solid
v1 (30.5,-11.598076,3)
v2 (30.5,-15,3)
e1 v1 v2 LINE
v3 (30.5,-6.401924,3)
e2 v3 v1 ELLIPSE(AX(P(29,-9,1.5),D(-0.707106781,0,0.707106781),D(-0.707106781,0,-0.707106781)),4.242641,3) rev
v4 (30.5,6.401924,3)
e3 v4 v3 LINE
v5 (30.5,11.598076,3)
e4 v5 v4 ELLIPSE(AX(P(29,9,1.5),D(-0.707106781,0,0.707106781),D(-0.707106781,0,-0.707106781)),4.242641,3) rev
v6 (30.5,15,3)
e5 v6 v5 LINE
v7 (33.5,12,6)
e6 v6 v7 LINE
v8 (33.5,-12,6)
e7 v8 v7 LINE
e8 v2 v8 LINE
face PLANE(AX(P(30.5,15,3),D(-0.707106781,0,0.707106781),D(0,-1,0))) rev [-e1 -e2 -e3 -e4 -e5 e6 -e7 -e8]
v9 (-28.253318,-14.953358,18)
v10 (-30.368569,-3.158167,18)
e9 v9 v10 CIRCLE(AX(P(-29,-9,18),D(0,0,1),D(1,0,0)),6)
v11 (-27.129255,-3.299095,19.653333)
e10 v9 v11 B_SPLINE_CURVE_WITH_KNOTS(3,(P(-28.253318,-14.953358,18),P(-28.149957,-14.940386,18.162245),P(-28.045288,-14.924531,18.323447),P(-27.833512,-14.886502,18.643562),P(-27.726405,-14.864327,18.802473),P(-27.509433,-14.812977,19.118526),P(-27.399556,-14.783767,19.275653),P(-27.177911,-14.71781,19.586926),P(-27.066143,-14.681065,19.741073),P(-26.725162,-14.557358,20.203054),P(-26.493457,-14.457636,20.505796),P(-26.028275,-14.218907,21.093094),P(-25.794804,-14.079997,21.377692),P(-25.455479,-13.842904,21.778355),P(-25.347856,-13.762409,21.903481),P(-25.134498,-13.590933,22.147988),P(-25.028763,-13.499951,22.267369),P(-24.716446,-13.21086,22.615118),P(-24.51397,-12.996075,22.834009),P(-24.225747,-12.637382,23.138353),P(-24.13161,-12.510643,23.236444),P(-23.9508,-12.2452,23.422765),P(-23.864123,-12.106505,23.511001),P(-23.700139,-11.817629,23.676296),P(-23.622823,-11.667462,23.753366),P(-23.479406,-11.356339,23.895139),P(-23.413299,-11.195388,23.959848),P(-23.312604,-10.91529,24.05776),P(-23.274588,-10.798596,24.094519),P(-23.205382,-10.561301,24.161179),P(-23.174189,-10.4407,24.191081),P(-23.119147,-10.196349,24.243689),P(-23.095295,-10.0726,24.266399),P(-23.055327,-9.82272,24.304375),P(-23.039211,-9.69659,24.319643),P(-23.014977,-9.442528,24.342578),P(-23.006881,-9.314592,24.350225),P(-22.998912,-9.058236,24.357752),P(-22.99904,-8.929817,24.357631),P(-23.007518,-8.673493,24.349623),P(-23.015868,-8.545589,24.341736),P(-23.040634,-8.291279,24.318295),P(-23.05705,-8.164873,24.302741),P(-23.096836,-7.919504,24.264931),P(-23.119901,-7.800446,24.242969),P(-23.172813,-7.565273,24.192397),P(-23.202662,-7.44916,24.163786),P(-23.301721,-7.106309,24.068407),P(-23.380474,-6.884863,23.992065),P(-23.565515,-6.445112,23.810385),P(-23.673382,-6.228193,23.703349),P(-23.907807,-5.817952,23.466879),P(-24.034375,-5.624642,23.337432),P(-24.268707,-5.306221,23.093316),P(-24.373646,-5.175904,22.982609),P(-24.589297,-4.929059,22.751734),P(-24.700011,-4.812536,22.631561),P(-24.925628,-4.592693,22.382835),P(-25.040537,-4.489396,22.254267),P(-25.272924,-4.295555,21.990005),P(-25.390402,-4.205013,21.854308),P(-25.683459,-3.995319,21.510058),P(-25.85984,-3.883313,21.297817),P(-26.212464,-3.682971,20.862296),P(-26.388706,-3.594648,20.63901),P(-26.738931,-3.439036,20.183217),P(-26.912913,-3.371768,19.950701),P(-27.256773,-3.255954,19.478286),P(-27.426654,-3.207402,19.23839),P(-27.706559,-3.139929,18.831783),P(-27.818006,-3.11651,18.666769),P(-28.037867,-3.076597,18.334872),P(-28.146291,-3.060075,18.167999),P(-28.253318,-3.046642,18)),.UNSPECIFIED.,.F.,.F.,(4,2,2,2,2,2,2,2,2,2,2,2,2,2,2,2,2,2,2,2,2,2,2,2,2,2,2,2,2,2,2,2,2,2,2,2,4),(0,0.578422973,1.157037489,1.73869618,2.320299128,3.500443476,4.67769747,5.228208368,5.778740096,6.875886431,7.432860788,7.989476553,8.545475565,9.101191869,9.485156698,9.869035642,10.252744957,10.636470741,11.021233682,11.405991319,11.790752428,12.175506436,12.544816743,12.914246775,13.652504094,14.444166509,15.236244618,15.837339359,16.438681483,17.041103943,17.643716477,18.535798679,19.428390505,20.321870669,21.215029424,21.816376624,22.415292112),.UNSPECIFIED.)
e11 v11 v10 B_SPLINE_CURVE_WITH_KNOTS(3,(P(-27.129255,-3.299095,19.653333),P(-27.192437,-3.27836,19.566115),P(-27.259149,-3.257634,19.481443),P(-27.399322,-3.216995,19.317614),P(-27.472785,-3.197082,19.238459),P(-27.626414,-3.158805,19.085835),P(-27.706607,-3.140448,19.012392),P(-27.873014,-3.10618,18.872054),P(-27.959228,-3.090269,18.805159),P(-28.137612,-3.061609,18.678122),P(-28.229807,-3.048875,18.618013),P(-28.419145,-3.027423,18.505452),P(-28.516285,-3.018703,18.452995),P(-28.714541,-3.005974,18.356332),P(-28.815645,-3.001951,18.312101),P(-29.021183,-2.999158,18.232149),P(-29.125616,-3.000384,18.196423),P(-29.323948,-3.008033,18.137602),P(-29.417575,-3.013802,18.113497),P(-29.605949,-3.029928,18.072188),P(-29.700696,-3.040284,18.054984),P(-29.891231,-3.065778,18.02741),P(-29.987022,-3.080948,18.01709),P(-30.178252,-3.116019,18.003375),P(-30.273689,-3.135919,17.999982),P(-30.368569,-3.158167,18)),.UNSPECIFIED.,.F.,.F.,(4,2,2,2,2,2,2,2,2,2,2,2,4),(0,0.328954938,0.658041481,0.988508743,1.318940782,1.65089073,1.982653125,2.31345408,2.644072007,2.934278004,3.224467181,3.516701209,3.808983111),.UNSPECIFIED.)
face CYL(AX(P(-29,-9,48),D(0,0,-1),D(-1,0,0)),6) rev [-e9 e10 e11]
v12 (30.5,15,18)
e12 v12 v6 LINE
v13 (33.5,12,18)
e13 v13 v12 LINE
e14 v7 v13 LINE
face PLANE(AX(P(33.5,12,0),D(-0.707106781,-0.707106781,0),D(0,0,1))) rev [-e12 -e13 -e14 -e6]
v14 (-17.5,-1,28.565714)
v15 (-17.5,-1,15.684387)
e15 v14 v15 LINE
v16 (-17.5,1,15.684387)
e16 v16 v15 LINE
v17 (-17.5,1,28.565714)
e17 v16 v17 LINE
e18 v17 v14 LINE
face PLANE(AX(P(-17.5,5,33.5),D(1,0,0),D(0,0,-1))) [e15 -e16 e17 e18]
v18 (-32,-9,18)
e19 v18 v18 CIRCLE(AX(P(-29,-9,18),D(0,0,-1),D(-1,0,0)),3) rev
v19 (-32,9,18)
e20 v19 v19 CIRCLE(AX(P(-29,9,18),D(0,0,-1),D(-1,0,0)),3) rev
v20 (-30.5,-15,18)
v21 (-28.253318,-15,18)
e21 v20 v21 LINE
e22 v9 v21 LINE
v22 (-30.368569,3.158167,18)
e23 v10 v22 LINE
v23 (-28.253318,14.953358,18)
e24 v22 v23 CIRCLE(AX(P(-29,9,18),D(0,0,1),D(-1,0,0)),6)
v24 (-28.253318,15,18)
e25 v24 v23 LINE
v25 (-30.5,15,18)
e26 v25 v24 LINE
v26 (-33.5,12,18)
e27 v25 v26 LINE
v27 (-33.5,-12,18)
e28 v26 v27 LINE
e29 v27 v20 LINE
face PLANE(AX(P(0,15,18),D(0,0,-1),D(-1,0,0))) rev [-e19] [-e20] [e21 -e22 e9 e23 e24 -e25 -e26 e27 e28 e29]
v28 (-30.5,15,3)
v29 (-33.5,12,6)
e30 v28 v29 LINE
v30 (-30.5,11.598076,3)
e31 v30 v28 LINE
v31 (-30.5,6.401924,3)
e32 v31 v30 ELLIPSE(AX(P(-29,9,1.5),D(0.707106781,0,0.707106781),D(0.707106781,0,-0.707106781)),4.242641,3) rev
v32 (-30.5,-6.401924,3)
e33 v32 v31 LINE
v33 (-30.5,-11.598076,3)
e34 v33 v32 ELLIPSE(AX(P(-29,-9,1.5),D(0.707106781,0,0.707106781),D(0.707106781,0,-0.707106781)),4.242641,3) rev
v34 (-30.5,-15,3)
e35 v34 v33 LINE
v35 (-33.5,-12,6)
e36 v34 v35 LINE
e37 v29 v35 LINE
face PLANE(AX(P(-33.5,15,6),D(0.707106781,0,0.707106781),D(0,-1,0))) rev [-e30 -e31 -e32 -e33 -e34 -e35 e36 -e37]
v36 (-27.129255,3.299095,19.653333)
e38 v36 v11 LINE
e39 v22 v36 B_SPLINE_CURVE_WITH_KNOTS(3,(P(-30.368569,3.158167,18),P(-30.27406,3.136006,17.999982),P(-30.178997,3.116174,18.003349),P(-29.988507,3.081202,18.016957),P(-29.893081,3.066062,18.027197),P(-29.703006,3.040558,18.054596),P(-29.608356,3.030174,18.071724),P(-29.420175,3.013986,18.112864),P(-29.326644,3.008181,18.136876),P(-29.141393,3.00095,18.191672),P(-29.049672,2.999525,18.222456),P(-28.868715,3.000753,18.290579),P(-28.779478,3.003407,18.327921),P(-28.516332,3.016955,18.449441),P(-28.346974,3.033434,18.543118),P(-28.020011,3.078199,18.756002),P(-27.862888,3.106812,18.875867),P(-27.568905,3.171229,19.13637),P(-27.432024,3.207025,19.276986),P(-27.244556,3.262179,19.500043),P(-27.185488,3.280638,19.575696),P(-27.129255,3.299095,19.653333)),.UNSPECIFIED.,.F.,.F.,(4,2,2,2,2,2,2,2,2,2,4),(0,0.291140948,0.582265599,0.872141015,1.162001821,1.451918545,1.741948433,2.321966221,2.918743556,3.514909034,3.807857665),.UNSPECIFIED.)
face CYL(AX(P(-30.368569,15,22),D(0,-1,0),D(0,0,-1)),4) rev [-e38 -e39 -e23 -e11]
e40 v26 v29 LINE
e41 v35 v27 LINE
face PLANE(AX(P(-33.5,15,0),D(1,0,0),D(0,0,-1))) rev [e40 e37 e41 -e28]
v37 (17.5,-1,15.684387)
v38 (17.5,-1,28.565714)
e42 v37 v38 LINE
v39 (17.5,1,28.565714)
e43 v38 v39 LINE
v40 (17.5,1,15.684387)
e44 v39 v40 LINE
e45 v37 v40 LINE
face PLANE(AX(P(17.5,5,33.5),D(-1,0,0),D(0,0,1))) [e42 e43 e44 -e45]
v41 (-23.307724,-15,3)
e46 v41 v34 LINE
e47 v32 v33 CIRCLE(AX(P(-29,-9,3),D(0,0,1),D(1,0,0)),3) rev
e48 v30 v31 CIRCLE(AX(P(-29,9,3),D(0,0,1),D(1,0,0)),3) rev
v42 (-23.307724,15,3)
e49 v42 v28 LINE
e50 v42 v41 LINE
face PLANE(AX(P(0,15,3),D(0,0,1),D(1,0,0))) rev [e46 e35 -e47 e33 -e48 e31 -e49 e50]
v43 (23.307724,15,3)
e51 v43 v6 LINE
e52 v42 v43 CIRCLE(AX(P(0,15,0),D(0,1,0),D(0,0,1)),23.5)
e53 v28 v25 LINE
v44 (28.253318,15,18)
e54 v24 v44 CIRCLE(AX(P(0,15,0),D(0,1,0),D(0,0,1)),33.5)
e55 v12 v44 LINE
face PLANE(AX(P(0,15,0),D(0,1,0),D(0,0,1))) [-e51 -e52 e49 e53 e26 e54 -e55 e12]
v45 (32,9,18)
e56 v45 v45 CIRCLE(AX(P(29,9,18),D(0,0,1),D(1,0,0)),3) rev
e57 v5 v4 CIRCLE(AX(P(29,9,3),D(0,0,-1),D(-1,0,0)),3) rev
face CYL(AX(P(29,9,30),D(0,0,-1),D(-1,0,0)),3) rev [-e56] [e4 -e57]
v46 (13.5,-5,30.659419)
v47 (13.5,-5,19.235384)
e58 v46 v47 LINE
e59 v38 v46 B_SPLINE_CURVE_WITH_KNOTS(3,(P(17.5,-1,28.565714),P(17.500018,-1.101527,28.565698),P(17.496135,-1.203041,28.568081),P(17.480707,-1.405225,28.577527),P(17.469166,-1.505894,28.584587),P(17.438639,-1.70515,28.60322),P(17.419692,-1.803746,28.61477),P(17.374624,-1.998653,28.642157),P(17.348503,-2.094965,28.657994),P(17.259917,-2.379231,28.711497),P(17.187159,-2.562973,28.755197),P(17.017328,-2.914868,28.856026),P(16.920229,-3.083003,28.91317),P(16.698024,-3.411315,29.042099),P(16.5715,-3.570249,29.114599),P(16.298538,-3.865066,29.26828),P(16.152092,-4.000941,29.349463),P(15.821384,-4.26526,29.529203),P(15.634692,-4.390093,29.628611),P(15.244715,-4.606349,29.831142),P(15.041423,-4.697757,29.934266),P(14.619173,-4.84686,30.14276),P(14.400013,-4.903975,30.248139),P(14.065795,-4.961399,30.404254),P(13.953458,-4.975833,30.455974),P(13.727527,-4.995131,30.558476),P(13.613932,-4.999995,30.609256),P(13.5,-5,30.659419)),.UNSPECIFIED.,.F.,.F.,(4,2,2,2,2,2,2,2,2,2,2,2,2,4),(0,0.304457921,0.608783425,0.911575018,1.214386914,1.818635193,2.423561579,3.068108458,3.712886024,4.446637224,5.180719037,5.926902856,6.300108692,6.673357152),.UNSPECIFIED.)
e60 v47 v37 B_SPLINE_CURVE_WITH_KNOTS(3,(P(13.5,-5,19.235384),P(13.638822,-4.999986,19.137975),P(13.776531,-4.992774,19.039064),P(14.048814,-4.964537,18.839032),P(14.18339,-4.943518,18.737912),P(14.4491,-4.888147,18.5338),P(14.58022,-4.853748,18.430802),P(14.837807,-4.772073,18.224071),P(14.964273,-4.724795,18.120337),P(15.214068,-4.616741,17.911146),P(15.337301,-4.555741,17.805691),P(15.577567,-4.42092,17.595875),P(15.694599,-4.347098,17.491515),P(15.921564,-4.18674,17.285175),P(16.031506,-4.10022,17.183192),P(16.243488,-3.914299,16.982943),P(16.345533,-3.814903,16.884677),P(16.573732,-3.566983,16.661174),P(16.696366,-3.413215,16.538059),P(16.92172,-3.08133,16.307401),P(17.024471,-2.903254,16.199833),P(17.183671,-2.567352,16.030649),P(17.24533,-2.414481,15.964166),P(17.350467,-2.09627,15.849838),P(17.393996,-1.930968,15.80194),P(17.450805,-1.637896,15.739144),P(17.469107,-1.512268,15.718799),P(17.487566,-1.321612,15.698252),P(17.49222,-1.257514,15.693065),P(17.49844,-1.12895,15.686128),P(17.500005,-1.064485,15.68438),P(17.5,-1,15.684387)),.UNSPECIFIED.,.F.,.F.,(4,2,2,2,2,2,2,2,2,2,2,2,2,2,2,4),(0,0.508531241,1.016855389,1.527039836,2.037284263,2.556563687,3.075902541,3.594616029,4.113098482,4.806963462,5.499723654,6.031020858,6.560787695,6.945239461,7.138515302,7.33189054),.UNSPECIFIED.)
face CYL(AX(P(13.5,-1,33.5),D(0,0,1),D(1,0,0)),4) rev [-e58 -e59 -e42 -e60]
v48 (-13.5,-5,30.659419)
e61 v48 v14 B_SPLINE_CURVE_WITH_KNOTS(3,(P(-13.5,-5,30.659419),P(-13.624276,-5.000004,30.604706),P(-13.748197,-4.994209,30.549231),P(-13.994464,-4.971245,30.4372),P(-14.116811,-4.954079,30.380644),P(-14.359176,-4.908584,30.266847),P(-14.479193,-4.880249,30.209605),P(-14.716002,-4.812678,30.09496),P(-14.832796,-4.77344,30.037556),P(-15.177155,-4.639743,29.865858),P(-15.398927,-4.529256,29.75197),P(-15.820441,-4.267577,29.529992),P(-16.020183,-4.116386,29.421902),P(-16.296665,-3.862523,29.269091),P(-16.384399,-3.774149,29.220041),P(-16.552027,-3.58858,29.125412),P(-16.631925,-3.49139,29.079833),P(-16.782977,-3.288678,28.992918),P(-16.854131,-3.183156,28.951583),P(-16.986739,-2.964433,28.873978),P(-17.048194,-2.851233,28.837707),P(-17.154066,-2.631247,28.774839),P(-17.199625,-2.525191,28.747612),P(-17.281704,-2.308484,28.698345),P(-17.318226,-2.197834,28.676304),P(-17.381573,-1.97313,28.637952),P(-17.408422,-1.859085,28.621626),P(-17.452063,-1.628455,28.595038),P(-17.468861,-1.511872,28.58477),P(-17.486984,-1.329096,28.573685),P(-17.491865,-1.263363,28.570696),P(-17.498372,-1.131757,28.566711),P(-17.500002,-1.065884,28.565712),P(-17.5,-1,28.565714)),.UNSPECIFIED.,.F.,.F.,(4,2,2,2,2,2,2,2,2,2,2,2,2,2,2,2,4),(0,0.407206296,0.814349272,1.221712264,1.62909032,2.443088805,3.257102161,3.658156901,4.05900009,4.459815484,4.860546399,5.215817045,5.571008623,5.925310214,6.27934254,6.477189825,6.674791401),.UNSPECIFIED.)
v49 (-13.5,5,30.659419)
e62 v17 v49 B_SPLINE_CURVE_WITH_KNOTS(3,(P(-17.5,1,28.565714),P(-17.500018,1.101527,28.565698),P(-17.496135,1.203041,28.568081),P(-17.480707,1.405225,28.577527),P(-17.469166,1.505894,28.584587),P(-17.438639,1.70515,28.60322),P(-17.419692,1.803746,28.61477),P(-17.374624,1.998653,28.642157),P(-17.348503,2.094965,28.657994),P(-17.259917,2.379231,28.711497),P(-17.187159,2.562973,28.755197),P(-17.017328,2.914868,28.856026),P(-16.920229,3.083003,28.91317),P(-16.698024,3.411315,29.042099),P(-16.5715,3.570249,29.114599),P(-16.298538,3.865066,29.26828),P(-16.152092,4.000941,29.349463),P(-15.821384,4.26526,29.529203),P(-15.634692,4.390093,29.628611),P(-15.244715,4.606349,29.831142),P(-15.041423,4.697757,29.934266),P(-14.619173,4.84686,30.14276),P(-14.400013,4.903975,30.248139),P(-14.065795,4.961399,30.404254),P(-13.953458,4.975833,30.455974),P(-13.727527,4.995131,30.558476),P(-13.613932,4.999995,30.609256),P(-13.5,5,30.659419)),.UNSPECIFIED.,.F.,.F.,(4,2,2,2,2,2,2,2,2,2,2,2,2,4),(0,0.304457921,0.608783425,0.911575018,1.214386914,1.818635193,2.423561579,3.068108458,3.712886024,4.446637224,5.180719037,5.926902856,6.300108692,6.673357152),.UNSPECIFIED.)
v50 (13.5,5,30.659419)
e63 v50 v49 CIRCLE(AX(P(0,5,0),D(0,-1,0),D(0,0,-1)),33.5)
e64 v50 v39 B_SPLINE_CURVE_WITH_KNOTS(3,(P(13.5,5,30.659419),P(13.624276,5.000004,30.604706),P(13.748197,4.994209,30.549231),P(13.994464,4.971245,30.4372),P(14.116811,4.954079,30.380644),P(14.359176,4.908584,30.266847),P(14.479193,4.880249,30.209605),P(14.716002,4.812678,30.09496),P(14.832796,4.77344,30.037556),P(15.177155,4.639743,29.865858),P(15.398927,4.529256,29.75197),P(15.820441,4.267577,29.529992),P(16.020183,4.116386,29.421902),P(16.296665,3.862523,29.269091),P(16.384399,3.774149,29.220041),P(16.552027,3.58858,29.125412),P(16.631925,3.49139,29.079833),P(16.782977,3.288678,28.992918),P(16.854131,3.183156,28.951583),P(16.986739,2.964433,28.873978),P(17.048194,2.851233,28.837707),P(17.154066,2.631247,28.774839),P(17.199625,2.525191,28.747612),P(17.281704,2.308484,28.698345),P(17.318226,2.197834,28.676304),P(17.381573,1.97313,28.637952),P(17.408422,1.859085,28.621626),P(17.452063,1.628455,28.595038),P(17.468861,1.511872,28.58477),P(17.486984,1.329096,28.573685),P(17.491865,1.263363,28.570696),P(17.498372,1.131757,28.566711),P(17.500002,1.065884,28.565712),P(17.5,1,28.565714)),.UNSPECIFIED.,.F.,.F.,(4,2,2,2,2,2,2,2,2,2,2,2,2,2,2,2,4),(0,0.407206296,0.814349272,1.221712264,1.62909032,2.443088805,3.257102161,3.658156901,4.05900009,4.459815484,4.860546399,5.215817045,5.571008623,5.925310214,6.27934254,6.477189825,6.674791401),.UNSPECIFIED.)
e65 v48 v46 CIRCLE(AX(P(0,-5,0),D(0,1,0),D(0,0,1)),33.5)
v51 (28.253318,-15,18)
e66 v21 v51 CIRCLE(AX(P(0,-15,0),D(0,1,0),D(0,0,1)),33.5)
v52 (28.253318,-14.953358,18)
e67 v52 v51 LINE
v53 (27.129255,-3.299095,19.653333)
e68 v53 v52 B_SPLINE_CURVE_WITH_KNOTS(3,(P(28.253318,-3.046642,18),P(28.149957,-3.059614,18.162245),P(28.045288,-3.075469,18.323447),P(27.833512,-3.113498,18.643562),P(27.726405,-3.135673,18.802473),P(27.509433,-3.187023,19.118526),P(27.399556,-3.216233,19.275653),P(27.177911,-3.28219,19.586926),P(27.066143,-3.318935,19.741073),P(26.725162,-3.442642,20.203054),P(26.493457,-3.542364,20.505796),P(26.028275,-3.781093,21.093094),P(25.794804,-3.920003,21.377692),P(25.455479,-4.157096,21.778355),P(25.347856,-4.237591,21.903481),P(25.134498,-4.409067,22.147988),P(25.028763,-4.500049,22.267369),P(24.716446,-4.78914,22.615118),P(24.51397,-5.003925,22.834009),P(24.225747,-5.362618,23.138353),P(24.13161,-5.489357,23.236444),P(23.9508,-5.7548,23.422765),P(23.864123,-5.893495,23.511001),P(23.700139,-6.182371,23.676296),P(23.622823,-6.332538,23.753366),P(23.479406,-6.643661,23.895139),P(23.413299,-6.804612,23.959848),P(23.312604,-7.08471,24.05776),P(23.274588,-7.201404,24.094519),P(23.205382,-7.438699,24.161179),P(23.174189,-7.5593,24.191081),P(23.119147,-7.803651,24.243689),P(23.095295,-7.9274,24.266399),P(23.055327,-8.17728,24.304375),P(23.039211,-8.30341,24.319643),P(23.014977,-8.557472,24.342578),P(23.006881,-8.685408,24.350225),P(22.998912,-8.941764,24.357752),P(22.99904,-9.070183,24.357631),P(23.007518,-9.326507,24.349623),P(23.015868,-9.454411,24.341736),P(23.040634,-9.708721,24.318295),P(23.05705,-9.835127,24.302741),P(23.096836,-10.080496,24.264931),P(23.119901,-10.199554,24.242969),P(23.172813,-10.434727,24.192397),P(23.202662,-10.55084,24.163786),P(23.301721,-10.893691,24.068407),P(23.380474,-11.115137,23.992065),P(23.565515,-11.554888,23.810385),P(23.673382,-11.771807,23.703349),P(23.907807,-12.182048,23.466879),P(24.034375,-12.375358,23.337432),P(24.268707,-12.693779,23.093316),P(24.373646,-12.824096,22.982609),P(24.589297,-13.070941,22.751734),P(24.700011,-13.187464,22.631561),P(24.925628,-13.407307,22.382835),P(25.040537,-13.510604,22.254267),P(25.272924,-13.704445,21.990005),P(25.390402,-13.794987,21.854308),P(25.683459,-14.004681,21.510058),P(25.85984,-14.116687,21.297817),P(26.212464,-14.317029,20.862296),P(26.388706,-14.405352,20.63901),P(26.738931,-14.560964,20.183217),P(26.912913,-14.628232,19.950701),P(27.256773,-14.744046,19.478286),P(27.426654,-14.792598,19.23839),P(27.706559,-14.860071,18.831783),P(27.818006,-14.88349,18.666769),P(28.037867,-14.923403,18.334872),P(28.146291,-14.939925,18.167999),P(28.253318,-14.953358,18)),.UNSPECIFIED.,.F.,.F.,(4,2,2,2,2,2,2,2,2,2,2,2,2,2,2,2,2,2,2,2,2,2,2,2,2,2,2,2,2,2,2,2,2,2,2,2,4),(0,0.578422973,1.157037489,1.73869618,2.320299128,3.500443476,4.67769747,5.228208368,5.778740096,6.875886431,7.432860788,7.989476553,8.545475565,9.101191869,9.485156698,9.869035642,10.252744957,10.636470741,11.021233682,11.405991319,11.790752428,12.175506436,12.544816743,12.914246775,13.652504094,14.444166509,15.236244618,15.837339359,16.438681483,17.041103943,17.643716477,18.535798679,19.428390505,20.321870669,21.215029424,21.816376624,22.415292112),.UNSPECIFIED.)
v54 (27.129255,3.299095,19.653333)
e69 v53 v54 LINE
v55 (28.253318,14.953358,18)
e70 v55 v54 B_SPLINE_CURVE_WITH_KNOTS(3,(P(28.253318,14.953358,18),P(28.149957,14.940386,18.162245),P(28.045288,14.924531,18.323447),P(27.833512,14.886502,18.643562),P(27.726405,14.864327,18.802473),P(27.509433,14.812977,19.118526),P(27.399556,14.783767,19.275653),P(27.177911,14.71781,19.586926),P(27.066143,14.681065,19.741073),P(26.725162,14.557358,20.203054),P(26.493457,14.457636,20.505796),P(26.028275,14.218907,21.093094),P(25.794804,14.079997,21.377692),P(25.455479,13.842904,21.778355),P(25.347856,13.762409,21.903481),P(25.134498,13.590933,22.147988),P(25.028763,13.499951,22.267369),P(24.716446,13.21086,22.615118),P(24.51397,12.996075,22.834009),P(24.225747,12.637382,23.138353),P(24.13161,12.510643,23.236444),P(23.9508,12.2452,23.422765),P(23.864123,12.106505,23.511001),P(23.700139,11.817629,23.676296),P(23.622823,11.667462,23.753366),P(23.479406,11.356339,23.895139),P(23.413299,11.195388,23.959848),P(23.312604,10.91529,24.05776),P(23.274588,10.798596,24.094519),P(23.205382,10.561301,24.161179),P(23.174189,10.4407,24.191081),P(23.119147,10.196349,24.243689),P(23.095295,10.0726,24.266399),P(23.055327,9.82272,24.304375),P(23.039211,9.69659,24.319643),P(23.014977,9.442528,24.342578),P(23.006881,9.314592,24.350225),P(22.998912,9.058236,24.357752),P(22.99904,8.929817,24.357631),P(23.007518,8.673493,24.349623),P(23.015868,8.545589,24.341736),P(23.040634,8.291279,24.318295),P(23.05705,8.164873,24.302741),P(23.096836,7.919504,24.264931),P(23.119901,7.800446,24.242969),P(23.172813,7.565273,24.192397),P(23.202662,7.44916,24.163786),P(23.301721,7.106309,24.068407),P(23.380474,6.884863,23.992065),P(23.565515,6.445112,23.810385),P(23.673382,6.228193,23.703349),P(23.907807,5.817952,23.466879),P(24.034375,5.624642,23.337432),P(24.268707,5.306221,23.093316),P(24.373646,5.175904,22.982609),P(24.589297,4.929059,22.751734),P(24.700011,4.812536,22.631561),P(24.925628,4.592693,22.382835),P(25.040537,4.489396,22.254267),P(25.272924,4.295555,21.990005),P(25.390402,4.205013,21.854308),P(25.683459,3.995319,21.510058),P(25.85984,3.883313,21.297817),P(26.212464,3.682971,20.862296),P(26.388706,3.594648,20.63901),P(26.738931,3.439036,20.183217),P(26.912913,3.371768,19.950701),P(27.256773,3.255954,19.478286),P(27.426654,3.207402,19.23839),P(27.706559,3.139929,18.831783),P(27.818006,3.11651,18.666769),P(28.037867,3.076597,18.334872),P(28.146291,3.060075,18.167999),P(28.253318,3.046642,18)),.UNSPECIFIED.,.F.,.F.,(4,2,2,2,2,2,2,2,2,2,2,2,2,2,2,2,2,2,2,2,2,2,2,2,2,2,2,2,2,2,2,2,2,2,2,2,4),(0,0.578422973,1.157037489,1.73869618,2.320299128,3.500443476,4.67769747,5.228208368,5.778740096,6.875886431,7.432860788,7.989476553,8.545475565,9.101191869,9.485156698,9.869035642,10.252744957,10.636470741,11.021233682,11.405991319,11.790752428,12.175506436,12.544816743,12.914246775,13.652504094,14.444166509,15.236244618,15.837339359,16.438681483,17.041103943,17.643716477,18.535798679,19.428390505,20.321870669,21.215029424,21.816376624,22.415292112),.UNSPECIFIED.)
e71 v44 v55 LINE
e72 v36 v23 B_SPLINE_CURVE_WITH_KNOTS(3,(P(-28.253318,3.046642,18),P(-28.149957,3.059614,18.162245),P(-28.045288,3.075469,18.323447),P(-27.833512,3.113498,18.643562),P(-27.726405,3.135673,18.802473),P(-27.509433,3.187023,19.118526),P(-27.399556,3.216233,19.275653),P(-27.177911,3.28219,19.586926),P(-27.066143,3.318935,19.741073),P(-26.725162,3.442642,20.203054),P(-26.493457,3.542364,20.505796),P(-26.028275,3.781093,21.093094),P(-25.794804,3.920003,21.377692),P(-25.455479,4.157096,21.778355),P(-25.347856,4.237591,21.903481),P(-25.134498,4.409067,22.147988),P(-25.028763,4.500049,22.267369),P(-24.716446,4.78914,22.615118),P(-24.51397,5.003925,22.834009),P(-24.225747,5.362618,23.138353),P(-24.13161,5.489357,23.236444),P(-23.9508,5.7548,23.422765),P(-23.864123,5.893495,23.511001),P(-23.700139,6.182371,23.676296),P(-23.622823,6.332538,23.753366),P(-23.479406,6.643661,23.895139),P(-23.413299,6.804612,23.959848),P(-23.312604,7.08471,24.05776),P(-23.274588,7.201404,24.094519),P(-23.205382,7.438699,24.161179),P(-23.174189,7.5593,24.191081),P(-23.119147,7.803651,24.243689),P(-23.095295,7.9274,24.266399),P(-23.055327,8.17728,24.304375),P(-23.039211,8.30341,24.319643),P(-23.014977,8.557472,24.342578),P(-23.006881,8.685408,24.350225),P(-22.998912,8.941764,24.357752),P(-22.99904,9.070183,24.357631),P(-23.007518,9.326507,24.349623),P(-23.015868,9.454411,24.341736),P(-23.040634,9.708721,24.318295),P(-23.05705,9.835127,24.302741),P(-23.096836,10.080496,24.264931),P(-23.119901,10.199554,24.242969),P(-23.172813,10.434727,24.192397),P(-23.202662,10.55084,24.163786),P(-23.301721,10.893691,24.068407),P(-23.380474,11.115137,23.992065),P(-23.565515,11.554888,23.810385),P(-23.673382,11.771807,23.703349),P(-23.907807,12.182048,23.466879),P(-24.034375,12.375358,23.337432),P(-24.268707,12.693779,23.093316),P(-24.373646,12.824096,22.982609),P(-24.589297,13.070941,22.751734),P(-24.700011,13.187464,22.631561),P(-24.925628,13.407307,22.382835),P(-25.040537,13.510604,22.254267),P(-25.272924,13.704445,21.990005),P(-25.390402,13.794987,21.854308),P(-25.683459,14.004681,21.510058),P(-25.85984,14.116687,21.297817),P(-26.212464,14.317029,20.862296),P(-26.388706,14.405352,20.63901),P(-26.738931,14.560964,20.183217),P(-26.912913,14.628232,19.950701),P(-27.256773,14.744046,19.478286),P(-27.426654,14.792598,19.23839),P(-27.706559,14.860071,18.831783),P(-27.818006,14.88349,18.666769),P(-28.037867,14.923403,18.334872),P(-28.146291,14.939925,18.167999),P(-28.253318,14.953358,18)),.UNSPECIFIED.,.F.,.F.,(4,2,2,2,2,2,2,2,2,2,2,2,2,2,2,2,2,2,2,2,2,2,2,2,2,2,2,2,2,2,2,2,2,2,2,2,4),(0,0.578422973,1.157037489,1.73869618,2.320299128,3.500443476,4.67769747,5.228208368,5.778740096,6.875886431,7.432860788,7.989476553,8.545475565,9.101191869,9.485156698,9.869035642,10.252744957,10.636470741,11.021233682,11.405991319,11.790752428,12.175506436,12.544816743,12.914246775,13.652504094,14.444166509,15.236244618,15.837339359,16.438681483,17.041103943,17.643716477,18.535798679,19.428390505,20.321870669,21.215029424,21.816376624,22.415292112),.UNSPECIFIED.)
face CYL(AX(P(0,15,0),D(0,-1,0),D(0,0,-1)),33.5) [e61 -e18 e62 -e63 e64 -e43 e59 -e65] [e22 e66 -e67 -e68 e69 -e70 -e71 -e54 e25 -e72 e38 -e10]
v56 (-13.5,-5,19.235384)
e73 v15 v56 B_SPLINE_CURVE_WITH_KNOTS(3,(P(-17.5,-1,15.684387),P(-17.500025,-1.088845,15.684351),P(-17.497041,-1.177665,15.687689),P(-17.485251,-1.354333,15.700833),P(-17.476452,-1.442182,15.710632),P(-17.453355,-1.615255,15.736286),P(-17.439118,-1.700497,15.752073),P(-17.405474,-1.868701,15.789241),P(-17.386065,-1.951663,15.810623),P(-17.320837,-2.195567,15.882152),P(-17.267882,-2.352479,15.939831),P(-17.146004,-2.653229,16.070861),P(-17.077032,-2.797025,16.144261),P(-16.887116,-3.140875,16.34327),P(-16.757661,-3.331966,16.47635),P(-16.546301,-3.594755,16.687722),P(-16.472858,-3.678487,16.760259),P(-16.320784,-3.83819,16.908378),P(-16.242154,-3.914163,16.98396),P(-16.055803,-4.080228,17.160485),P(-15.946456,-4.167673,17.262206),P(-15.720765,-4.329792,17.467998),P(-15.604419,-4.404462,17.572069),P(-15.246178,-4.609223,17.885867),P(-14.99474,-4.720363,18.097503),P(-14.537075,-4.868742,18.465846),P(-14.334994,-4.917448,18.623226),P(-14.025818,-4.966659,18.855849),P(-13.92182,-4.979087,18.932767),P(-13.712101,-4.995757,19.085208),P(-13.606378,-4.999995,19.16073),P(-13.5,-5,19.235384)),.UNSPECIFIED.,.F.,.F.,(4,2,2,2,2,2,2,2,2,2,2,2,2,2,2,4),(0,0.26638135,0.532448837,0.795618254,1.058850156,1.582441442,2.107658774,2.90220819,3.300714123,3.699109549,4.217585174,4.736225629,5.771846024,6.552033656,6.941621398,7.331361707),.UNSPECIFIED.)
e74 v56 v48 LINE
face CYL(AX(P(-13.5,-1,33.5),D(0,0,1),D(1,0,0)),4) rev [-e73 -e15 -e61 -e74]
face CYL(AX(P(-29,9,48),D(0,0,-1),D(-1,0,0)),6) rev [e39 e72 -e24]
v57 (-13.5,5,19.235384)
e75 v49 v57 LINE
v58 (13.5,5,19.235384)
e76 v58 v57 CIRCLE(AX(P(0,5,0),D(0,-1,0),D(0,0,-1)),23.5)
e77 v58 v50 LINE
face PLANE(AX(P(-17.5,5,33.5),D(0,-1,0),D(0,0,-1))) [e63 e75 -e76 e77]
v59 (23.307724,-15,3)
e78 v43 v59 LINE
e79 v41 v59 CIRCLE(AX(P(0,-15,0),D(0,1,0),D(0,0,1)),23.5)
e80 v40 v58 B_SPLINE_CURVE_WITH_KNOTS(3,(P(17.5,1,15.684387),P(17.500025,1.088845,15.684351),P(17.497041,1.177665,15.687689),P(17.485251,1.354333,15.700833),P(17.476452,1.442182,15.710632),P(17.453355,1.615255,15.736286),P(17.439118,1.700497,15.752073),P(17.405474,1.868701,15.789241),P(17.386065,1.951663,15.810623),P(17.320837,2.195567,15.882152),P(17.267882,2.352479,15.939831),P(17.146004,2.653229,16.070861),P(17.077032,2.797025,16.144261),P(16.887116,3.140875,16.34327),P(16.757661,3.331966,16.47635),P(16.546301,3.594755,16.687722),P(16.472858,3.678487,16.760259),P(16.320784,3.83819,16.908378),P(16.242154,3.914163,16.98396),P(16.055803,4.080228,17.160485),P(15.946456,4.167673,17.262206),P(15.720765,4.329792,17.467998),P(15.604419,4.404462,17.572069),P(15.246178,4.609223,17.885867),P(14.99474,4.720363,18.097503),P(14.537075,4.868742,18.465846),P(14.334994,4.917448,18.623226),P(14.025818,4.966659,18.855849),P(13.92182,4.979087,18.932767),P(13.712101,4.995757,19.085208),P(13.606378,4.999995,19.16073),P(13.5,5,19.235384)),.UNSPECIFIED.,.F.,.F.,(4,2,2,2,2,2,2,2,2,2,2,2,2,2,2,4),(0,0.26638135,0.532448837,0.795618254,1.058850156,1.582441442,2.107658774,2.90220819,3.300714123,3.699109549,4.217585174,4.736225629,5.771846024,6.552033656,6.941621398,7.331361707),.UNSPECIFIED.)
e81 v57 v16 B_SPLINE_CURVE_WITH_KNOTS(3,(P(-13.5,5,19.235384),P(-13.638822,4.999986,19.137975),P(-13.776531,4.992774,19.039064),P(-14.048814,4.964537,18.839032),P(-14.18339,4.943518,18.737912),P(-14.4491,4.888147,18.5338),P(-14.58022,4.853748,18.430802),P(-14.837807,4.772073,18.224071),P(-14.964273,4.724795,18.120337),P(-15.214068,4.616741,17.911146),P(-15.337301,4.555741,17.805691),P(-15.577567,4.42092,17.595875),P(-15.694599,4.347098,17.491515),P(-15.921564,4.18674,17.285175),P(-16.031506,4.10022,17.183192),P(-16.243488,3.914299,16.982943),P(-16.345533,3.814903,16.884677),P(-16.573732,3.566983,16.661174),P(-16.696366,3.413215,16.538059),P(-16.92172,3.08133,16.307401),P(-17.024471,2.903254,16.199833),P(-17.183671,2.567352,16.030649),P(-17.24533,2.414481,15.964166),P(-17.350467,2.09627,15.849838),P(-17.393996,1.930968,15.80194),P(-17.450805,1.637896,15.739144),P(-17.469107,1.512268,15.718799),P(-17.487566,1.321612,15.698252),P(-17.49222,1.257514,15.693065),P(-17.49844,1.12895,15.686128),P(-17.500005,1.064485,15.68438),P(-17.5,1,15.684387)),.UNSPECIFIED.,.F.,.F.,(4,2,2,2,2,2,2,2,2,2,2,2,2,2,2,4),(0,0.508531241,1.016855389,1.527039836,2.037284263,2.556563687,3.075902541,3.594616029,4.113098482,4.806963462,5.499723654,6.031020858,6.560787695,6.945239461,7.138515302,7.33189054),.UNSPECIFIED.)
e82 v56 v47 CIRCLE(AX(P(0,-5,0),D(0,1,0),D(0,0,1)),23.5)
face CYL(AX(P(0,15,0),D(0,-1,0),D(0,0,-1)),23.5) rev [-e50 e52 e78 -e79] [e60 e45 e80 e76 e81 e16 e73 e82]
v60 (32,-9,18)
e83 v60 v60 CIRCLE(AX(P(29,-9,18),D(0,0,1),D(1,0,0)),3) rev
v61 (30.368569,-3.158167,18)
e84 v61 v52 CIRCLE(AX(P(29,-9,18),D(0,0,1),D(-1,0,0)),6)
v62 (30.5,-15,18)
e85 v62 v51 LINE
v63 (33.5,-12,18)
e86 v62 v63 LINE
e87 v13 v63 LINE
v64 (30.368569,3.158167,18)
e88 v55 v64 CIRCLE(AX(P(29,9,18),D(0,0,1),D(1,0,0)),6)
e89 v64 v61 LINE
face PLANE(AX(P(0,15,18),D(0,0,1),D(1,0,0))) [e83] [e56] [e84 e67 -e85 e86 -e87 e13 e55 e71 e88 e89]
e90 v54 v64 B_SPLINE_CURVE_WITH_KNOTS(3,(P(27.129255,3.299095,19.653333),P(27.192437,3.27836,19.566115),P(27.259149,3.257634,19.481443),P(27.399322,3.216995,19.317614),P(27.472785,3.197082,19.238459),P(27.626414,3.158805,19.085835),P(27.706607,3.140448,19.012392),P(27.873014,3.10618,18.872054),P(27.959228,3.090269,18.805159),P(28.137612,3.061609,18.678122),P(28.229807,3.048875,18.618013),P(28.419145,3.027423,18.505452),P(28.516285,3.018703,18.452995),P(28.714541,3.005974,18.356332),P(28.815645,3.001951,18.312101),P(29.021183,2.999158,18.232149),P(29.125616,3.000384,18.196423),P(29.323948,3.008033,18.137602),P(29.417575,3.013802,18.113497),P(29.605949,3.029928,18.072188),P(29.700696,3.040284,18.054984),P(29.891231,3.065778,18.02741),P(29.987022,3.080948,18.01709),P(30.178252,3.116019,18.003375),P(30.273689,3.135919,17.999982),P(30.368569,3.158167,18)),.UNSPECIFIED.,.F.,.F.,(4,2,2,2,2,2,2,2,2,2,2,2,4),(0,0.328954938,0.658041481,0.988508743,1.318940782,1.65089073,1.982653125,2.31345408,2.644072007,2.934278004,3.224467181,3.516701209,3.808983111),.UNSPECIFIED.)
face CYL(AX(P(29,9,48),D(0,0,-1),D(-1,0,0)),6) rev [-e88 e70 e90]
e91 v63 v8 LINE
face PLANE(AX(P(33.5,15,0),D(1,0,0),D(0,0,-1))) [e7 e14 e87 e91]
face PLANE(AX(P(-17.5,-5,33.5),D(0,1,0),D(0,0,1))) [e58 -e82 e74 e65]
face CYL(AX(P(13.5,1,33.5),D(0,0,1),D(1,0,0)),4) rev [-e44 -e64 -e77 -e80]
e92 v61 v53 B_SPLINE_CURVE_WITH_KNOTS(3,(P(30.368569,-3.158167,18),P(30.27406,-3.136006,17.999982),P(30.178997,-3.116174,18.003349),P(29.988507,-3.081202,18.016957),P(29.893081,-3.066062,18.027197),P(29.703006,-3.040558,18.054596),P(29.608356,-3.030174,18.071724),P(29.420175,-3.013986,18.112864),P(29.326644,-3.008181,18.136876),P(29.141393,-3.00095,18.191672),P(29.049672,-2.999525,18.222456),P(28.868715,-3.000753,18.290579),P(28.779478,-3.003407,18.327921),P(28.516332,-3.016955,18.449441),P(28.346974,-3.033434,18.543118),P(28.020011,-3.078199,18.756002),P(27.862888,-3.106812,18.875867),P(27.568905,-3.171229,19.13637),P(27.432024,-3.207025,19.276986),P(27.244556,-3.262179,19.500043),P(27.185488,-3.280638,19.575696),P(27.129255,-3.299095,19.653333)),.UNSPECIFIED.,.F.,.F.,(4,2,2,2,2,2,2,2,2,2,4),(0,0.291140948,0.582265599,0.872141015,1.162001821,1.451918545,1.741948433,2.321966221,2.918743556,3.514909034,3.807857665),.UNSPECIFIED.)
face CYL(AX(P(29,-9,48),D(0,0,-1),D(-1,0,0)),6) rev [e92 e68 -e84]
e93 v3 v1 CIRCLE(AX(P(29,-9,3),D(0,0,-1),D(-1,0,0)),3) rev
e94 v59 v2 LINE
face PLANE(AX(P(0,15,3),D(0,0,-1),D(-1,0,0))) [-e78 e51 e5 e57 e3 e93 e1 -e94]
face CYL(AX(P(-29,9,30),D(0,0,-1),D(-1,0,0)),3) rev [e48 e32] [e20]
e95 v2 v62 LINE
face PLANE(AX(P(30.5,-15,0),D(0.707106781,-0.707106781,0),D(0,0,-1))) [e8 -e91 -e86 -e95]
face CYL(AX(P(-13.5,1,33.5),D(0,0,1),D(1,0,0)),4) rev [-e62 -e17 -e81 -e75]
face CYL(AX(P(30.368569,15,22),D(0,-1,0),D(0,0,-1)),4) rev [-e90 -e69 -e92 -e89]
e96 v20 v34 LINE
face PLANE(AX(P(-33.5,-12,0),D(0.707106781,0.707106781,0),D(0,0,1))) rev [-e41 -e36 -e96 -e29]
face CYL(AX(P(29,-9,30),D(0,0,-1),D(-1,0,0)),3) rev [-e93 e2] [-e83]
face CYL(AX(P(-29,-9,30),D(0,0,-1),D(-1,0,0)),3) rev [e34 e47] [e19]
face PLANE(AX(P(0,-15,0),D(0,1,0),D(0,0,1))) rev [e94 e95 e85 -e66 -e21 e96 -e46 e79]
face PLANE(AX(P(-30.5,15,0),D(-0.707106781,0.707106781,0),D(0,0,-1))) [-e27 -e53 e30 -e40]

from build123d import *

# Parameters (mm, degrees)
BOSS_EXTRUDE1_DEPTH = 15
SKETCH2_R           = 3
CUT_EXTRUDE1_DEPTH  = 30
SKETCH3_W           = 35
SKETCH3_H           = 10
CUT_EXTRUDE2_DEPTH  = 50.694064129
FILLET1_R           = 4
SKETCH4_R           = 6
CUT_EXTRUDE3_DEPTH  = 30
FILLET2_R           = 4
CHAMFER1_SIZE       = 3


with BuildPart() as part:
    # Sketch1 → Boss-Extrude1 (new, symmetric)
    with BuildSketch(Plane(origin=(0, 0, 0), x_dir=(1, 0, 0), z_dir=(0, 1, 0))):
        with BuildLine():
            ThreePointArc((-28.253318389, -18), (-31.709094157, -10.806634433), (-33.365401241, -3))
            Line((-33.365401241, -3), (-33.5, -3))
            Line((-33.5, -3), (-33.5, -18))
            Line((-33.5, -18), (-28.253318389, -18))
        make_face()
        with BuildLine():
            Line((33.365401241, -3), (23.307724042, -3))
            ThreePointArc((23.307724042, -3), (0, -23.5), (-23.307724042, -3))
            Line((-23.307724042, -3), (-33.365401241, -3))
            ThreePointArc((-33.365401241, -3), (-31.709094157, -10.806634433), (-28.253318389, -18))
            ThreePointArc((-28.253318389, -18), (0, -33.5), (28.253318389, -18))
            ThreePointArc((28.253318389, -18), (31.709094157, -10.806634433), (33.365401241, -3))
        make_face()
        with BuildLine():
            Line((33.5, -3), (33.365401241, -3))
            ThreePointArc((33.365401241, -3), (31.709094157, -10.806634433), (28.253318389, -18))
            Line((28.253318389, -18), (33.5, -18))
            Line((33.5, -18), (33.5, -3))
        make_face()
    extrude(amount=BOSS_EXTRUDE1_DEPTH, both=True)

    # Sketch2 → Cut-Extrude1 (cut)
    with BuildSketch(Plane.XY):
        with Locations(Location((29, -9, 0), (0, 0, 180))):
            Circle(SKETCH2_R)
        with Locations(Location((29, 9, 0), (0, 0, 180))):
            Circle(SKETCH2_R)
        with Locations(Location((-29, 9, 0), (0, 0, 284.412066788))):
            Circle(SKETCH2_R)
        with Locations(Location((-29, -9, 0), (0, 0, 75.587933212))):
            Circle(SKETCH2_R)
    extrude(amount=CUT_EXTRUDE1_DEPTH, mode=Mode.SUBTRACT)

    # Sketch3 → Cut-Extrude2 (cut, through all)
    with BuildSketch(Plane.XY):
        Rectangle(SKETCH3_W, SKETCH3_H)
    extrude(amount=CUT_EXTRUDE2_DEPTH, mode=Mode.SUBTRACT)

    # Fillet1
    fillet1_edges = [part.edges().sort_by_distance(p)[0] for p in [
        (17.5, -5, 22.125050428),
        (17.5, 5, 22.125050428),
        (-17.5, 5, 22.125050428),
        (-17.5, -5, 22.125050428),
    ]]
    fillet(fillet1_edges, radius=FILLET1_R)

    # Sketch4 → Cut-Extrude3 (cut)
    with BuildSketch(Plane.XY.offset(18)):
        with Locations((29, 9)):
            Circle(SKETCH4_R)
        with Locations((29, -9)):
            Circle(SKETCH4_R)
        with Locations((-29, -9)):
            Circle(SKETCH4_R)
        with Locations((-29, 9)):
            Circle(SKETCH4_R)
    extrude(amount=CUT_EXTRUDE3_DEPTH, mode=Mode.SUBTRACT)

    # Fillet2
    # the kernel refuses this fillet: 4 mm, written as the material it adds along each edge
    with BuildSketch(Plane(origin=(28.253318389, 8.334769634, 18), x_dir=(1, 0, 0), z_dir=(0, -1, 0))) as fillet2_piece_1_section:
        with BuildLine():
            CenterArc((2.115250889, 4), FILLET2_R, 215.920819838, 54.079180162)
            ThreePointArc((-1.124063167, 1.653333333), (-0.549695111, 0.835053949), (0, 0))
            Line((0, 0), (2.115250889, 0))
        make_face()
    fillet2_piece_1 = extrude(amount=16.669539268, mode=Mode.PRIVATE)
    fillet2_piece_1 = fillet2_piece_1 - Plane(origin=(29, 9, 18.362807828), x_dir=(1, 0, 0), z_dir=(0, 0, -1)) * Cylinder(6, 42, mode=Mode.PRIVATE)
    fillet2_piece_1 = fillet2_piece_1 - Plane(origin=(29, -9, 18.362807828), x_dir=(1, 0, 0), z_dir=(0, 0, -1)) * Cylinder(6, 42, mode=Mode.PRIVATE)
    add(fillet2_piece_1)
    with BuildSketch(Plane(origin=(-28.253318389, -8.334769634, 18), x_dir=(-1, 0, 0), z_dir=(0, 1, 0))) as fillet2_piece_2_section:
        with BuildLine():
            CenterArc((2.115250889, 4), FILLET2_R, 215.920819838, 54.079180162)
            ThreePointArc((-1.124063167, 1.653333333), (-0.549695111, 0.835053949), (0, 0))
            Line((0, 0), (2.115250889, 0))
        make_face()
    fillet2_piece_2 = extrude(amount=16.669539268, mode=Mode.PRIVATE)
    fillet2_piece_2 = fillet2_piece_2 - Plane(origin=(-29, -9, 18.362807828), x_dir=(1, 0, 0), z_dir=(0, 0, -1)) * Cylinder(6, 42, mode=Mode.PRIVATE)
    fillet2_piece_2 = fillet2_piece_2 - Plane(origin=(-29, 9, 18.362807828), x_dir=(1, 0, 0), z_dir=(0, 0, -1)) * Cylinder(6, 42, mode=Mode.PRIVATE)
    add(fillet2_piece_2)

    # Chamfer1
    # the kernel refuses this chamfer: 3 mm, written as the material it takes off along each edge
    with BuildSketch(Plane(origin=(33.5, -15, 25.715048964), x_dir=(-0.9996219169112968, -0.02749587661058619, 0), z_dir=(0, 0, -1)), Plane(origin=(-33.5, 15, -4.715048964), x_dir=(-0.02749587661058678, -0.9996219169112968, 0), z_dir=(0, 0, 1))) as chamfer1_piece_1:
        Polygon((CHAMFER1_SIZE * 0.999621916911, CHAMFER1_SIZE * 0.0274958766106), (-CHAMFER1_SIZE * 0.0274958766106, CHAMFER1_SIZE * 0.999621916911), (0, 0), align=None)
    extrude(amount=30.430097928, mode=Mode.SUBTRACT)
    with BuildSketch(Plane(origin=(-33.5, 22.715048964, 3), x_dir=(-0.02749587661058677, 0, 0.9996219169112968), z_dir=(0, -1, 0)), Plane(origin=(33.5, -22.715048964, 3), x_dir=(0.027495876610586757, 0, 0.9996219169112968), z_dir=(0, 1, 0))) as chamfer1_piece_2:
        Polygon((CHAMFER1_SIZE * 0.999621916911, -CHAMFER1_SIZE * 0.0274958766106), (-CHAMFER1_SIZE * 0.0274958766106, -CHAMFER1_SIZE * 0.999621916911), (0, 0), align=None)
    extrude(amount=45.430097928, mode=Mode.SUBTRACT)
    with BuildSketch(Plane(origin=(33.5, 15, 25.715048964), x_dir=(-0.9996219169112968, 0.02749587661058619, 0), z_dir=(0, 0, -1)), Plane(origin=(-33.5, -15, -4.715048964), x_dir=(-0.02749587661058678, 0.9996219169112968, 0), z_dir=(0, 0, 1))) as chamfer1_piece_3:
        Polygon((CHAMFER1_SIZE * 0.999621916911, -CHAMFER1_SIZE * 0.0274958766106), (-CHAMFER1_SIZE * 0.0274958766106, -CHAMFER1_SIZE * 0.999621916911), (0, 0), align=None)
    extrude(amount=30.430097928, mode=Mode.SUBTRACT)


solid = part.part
